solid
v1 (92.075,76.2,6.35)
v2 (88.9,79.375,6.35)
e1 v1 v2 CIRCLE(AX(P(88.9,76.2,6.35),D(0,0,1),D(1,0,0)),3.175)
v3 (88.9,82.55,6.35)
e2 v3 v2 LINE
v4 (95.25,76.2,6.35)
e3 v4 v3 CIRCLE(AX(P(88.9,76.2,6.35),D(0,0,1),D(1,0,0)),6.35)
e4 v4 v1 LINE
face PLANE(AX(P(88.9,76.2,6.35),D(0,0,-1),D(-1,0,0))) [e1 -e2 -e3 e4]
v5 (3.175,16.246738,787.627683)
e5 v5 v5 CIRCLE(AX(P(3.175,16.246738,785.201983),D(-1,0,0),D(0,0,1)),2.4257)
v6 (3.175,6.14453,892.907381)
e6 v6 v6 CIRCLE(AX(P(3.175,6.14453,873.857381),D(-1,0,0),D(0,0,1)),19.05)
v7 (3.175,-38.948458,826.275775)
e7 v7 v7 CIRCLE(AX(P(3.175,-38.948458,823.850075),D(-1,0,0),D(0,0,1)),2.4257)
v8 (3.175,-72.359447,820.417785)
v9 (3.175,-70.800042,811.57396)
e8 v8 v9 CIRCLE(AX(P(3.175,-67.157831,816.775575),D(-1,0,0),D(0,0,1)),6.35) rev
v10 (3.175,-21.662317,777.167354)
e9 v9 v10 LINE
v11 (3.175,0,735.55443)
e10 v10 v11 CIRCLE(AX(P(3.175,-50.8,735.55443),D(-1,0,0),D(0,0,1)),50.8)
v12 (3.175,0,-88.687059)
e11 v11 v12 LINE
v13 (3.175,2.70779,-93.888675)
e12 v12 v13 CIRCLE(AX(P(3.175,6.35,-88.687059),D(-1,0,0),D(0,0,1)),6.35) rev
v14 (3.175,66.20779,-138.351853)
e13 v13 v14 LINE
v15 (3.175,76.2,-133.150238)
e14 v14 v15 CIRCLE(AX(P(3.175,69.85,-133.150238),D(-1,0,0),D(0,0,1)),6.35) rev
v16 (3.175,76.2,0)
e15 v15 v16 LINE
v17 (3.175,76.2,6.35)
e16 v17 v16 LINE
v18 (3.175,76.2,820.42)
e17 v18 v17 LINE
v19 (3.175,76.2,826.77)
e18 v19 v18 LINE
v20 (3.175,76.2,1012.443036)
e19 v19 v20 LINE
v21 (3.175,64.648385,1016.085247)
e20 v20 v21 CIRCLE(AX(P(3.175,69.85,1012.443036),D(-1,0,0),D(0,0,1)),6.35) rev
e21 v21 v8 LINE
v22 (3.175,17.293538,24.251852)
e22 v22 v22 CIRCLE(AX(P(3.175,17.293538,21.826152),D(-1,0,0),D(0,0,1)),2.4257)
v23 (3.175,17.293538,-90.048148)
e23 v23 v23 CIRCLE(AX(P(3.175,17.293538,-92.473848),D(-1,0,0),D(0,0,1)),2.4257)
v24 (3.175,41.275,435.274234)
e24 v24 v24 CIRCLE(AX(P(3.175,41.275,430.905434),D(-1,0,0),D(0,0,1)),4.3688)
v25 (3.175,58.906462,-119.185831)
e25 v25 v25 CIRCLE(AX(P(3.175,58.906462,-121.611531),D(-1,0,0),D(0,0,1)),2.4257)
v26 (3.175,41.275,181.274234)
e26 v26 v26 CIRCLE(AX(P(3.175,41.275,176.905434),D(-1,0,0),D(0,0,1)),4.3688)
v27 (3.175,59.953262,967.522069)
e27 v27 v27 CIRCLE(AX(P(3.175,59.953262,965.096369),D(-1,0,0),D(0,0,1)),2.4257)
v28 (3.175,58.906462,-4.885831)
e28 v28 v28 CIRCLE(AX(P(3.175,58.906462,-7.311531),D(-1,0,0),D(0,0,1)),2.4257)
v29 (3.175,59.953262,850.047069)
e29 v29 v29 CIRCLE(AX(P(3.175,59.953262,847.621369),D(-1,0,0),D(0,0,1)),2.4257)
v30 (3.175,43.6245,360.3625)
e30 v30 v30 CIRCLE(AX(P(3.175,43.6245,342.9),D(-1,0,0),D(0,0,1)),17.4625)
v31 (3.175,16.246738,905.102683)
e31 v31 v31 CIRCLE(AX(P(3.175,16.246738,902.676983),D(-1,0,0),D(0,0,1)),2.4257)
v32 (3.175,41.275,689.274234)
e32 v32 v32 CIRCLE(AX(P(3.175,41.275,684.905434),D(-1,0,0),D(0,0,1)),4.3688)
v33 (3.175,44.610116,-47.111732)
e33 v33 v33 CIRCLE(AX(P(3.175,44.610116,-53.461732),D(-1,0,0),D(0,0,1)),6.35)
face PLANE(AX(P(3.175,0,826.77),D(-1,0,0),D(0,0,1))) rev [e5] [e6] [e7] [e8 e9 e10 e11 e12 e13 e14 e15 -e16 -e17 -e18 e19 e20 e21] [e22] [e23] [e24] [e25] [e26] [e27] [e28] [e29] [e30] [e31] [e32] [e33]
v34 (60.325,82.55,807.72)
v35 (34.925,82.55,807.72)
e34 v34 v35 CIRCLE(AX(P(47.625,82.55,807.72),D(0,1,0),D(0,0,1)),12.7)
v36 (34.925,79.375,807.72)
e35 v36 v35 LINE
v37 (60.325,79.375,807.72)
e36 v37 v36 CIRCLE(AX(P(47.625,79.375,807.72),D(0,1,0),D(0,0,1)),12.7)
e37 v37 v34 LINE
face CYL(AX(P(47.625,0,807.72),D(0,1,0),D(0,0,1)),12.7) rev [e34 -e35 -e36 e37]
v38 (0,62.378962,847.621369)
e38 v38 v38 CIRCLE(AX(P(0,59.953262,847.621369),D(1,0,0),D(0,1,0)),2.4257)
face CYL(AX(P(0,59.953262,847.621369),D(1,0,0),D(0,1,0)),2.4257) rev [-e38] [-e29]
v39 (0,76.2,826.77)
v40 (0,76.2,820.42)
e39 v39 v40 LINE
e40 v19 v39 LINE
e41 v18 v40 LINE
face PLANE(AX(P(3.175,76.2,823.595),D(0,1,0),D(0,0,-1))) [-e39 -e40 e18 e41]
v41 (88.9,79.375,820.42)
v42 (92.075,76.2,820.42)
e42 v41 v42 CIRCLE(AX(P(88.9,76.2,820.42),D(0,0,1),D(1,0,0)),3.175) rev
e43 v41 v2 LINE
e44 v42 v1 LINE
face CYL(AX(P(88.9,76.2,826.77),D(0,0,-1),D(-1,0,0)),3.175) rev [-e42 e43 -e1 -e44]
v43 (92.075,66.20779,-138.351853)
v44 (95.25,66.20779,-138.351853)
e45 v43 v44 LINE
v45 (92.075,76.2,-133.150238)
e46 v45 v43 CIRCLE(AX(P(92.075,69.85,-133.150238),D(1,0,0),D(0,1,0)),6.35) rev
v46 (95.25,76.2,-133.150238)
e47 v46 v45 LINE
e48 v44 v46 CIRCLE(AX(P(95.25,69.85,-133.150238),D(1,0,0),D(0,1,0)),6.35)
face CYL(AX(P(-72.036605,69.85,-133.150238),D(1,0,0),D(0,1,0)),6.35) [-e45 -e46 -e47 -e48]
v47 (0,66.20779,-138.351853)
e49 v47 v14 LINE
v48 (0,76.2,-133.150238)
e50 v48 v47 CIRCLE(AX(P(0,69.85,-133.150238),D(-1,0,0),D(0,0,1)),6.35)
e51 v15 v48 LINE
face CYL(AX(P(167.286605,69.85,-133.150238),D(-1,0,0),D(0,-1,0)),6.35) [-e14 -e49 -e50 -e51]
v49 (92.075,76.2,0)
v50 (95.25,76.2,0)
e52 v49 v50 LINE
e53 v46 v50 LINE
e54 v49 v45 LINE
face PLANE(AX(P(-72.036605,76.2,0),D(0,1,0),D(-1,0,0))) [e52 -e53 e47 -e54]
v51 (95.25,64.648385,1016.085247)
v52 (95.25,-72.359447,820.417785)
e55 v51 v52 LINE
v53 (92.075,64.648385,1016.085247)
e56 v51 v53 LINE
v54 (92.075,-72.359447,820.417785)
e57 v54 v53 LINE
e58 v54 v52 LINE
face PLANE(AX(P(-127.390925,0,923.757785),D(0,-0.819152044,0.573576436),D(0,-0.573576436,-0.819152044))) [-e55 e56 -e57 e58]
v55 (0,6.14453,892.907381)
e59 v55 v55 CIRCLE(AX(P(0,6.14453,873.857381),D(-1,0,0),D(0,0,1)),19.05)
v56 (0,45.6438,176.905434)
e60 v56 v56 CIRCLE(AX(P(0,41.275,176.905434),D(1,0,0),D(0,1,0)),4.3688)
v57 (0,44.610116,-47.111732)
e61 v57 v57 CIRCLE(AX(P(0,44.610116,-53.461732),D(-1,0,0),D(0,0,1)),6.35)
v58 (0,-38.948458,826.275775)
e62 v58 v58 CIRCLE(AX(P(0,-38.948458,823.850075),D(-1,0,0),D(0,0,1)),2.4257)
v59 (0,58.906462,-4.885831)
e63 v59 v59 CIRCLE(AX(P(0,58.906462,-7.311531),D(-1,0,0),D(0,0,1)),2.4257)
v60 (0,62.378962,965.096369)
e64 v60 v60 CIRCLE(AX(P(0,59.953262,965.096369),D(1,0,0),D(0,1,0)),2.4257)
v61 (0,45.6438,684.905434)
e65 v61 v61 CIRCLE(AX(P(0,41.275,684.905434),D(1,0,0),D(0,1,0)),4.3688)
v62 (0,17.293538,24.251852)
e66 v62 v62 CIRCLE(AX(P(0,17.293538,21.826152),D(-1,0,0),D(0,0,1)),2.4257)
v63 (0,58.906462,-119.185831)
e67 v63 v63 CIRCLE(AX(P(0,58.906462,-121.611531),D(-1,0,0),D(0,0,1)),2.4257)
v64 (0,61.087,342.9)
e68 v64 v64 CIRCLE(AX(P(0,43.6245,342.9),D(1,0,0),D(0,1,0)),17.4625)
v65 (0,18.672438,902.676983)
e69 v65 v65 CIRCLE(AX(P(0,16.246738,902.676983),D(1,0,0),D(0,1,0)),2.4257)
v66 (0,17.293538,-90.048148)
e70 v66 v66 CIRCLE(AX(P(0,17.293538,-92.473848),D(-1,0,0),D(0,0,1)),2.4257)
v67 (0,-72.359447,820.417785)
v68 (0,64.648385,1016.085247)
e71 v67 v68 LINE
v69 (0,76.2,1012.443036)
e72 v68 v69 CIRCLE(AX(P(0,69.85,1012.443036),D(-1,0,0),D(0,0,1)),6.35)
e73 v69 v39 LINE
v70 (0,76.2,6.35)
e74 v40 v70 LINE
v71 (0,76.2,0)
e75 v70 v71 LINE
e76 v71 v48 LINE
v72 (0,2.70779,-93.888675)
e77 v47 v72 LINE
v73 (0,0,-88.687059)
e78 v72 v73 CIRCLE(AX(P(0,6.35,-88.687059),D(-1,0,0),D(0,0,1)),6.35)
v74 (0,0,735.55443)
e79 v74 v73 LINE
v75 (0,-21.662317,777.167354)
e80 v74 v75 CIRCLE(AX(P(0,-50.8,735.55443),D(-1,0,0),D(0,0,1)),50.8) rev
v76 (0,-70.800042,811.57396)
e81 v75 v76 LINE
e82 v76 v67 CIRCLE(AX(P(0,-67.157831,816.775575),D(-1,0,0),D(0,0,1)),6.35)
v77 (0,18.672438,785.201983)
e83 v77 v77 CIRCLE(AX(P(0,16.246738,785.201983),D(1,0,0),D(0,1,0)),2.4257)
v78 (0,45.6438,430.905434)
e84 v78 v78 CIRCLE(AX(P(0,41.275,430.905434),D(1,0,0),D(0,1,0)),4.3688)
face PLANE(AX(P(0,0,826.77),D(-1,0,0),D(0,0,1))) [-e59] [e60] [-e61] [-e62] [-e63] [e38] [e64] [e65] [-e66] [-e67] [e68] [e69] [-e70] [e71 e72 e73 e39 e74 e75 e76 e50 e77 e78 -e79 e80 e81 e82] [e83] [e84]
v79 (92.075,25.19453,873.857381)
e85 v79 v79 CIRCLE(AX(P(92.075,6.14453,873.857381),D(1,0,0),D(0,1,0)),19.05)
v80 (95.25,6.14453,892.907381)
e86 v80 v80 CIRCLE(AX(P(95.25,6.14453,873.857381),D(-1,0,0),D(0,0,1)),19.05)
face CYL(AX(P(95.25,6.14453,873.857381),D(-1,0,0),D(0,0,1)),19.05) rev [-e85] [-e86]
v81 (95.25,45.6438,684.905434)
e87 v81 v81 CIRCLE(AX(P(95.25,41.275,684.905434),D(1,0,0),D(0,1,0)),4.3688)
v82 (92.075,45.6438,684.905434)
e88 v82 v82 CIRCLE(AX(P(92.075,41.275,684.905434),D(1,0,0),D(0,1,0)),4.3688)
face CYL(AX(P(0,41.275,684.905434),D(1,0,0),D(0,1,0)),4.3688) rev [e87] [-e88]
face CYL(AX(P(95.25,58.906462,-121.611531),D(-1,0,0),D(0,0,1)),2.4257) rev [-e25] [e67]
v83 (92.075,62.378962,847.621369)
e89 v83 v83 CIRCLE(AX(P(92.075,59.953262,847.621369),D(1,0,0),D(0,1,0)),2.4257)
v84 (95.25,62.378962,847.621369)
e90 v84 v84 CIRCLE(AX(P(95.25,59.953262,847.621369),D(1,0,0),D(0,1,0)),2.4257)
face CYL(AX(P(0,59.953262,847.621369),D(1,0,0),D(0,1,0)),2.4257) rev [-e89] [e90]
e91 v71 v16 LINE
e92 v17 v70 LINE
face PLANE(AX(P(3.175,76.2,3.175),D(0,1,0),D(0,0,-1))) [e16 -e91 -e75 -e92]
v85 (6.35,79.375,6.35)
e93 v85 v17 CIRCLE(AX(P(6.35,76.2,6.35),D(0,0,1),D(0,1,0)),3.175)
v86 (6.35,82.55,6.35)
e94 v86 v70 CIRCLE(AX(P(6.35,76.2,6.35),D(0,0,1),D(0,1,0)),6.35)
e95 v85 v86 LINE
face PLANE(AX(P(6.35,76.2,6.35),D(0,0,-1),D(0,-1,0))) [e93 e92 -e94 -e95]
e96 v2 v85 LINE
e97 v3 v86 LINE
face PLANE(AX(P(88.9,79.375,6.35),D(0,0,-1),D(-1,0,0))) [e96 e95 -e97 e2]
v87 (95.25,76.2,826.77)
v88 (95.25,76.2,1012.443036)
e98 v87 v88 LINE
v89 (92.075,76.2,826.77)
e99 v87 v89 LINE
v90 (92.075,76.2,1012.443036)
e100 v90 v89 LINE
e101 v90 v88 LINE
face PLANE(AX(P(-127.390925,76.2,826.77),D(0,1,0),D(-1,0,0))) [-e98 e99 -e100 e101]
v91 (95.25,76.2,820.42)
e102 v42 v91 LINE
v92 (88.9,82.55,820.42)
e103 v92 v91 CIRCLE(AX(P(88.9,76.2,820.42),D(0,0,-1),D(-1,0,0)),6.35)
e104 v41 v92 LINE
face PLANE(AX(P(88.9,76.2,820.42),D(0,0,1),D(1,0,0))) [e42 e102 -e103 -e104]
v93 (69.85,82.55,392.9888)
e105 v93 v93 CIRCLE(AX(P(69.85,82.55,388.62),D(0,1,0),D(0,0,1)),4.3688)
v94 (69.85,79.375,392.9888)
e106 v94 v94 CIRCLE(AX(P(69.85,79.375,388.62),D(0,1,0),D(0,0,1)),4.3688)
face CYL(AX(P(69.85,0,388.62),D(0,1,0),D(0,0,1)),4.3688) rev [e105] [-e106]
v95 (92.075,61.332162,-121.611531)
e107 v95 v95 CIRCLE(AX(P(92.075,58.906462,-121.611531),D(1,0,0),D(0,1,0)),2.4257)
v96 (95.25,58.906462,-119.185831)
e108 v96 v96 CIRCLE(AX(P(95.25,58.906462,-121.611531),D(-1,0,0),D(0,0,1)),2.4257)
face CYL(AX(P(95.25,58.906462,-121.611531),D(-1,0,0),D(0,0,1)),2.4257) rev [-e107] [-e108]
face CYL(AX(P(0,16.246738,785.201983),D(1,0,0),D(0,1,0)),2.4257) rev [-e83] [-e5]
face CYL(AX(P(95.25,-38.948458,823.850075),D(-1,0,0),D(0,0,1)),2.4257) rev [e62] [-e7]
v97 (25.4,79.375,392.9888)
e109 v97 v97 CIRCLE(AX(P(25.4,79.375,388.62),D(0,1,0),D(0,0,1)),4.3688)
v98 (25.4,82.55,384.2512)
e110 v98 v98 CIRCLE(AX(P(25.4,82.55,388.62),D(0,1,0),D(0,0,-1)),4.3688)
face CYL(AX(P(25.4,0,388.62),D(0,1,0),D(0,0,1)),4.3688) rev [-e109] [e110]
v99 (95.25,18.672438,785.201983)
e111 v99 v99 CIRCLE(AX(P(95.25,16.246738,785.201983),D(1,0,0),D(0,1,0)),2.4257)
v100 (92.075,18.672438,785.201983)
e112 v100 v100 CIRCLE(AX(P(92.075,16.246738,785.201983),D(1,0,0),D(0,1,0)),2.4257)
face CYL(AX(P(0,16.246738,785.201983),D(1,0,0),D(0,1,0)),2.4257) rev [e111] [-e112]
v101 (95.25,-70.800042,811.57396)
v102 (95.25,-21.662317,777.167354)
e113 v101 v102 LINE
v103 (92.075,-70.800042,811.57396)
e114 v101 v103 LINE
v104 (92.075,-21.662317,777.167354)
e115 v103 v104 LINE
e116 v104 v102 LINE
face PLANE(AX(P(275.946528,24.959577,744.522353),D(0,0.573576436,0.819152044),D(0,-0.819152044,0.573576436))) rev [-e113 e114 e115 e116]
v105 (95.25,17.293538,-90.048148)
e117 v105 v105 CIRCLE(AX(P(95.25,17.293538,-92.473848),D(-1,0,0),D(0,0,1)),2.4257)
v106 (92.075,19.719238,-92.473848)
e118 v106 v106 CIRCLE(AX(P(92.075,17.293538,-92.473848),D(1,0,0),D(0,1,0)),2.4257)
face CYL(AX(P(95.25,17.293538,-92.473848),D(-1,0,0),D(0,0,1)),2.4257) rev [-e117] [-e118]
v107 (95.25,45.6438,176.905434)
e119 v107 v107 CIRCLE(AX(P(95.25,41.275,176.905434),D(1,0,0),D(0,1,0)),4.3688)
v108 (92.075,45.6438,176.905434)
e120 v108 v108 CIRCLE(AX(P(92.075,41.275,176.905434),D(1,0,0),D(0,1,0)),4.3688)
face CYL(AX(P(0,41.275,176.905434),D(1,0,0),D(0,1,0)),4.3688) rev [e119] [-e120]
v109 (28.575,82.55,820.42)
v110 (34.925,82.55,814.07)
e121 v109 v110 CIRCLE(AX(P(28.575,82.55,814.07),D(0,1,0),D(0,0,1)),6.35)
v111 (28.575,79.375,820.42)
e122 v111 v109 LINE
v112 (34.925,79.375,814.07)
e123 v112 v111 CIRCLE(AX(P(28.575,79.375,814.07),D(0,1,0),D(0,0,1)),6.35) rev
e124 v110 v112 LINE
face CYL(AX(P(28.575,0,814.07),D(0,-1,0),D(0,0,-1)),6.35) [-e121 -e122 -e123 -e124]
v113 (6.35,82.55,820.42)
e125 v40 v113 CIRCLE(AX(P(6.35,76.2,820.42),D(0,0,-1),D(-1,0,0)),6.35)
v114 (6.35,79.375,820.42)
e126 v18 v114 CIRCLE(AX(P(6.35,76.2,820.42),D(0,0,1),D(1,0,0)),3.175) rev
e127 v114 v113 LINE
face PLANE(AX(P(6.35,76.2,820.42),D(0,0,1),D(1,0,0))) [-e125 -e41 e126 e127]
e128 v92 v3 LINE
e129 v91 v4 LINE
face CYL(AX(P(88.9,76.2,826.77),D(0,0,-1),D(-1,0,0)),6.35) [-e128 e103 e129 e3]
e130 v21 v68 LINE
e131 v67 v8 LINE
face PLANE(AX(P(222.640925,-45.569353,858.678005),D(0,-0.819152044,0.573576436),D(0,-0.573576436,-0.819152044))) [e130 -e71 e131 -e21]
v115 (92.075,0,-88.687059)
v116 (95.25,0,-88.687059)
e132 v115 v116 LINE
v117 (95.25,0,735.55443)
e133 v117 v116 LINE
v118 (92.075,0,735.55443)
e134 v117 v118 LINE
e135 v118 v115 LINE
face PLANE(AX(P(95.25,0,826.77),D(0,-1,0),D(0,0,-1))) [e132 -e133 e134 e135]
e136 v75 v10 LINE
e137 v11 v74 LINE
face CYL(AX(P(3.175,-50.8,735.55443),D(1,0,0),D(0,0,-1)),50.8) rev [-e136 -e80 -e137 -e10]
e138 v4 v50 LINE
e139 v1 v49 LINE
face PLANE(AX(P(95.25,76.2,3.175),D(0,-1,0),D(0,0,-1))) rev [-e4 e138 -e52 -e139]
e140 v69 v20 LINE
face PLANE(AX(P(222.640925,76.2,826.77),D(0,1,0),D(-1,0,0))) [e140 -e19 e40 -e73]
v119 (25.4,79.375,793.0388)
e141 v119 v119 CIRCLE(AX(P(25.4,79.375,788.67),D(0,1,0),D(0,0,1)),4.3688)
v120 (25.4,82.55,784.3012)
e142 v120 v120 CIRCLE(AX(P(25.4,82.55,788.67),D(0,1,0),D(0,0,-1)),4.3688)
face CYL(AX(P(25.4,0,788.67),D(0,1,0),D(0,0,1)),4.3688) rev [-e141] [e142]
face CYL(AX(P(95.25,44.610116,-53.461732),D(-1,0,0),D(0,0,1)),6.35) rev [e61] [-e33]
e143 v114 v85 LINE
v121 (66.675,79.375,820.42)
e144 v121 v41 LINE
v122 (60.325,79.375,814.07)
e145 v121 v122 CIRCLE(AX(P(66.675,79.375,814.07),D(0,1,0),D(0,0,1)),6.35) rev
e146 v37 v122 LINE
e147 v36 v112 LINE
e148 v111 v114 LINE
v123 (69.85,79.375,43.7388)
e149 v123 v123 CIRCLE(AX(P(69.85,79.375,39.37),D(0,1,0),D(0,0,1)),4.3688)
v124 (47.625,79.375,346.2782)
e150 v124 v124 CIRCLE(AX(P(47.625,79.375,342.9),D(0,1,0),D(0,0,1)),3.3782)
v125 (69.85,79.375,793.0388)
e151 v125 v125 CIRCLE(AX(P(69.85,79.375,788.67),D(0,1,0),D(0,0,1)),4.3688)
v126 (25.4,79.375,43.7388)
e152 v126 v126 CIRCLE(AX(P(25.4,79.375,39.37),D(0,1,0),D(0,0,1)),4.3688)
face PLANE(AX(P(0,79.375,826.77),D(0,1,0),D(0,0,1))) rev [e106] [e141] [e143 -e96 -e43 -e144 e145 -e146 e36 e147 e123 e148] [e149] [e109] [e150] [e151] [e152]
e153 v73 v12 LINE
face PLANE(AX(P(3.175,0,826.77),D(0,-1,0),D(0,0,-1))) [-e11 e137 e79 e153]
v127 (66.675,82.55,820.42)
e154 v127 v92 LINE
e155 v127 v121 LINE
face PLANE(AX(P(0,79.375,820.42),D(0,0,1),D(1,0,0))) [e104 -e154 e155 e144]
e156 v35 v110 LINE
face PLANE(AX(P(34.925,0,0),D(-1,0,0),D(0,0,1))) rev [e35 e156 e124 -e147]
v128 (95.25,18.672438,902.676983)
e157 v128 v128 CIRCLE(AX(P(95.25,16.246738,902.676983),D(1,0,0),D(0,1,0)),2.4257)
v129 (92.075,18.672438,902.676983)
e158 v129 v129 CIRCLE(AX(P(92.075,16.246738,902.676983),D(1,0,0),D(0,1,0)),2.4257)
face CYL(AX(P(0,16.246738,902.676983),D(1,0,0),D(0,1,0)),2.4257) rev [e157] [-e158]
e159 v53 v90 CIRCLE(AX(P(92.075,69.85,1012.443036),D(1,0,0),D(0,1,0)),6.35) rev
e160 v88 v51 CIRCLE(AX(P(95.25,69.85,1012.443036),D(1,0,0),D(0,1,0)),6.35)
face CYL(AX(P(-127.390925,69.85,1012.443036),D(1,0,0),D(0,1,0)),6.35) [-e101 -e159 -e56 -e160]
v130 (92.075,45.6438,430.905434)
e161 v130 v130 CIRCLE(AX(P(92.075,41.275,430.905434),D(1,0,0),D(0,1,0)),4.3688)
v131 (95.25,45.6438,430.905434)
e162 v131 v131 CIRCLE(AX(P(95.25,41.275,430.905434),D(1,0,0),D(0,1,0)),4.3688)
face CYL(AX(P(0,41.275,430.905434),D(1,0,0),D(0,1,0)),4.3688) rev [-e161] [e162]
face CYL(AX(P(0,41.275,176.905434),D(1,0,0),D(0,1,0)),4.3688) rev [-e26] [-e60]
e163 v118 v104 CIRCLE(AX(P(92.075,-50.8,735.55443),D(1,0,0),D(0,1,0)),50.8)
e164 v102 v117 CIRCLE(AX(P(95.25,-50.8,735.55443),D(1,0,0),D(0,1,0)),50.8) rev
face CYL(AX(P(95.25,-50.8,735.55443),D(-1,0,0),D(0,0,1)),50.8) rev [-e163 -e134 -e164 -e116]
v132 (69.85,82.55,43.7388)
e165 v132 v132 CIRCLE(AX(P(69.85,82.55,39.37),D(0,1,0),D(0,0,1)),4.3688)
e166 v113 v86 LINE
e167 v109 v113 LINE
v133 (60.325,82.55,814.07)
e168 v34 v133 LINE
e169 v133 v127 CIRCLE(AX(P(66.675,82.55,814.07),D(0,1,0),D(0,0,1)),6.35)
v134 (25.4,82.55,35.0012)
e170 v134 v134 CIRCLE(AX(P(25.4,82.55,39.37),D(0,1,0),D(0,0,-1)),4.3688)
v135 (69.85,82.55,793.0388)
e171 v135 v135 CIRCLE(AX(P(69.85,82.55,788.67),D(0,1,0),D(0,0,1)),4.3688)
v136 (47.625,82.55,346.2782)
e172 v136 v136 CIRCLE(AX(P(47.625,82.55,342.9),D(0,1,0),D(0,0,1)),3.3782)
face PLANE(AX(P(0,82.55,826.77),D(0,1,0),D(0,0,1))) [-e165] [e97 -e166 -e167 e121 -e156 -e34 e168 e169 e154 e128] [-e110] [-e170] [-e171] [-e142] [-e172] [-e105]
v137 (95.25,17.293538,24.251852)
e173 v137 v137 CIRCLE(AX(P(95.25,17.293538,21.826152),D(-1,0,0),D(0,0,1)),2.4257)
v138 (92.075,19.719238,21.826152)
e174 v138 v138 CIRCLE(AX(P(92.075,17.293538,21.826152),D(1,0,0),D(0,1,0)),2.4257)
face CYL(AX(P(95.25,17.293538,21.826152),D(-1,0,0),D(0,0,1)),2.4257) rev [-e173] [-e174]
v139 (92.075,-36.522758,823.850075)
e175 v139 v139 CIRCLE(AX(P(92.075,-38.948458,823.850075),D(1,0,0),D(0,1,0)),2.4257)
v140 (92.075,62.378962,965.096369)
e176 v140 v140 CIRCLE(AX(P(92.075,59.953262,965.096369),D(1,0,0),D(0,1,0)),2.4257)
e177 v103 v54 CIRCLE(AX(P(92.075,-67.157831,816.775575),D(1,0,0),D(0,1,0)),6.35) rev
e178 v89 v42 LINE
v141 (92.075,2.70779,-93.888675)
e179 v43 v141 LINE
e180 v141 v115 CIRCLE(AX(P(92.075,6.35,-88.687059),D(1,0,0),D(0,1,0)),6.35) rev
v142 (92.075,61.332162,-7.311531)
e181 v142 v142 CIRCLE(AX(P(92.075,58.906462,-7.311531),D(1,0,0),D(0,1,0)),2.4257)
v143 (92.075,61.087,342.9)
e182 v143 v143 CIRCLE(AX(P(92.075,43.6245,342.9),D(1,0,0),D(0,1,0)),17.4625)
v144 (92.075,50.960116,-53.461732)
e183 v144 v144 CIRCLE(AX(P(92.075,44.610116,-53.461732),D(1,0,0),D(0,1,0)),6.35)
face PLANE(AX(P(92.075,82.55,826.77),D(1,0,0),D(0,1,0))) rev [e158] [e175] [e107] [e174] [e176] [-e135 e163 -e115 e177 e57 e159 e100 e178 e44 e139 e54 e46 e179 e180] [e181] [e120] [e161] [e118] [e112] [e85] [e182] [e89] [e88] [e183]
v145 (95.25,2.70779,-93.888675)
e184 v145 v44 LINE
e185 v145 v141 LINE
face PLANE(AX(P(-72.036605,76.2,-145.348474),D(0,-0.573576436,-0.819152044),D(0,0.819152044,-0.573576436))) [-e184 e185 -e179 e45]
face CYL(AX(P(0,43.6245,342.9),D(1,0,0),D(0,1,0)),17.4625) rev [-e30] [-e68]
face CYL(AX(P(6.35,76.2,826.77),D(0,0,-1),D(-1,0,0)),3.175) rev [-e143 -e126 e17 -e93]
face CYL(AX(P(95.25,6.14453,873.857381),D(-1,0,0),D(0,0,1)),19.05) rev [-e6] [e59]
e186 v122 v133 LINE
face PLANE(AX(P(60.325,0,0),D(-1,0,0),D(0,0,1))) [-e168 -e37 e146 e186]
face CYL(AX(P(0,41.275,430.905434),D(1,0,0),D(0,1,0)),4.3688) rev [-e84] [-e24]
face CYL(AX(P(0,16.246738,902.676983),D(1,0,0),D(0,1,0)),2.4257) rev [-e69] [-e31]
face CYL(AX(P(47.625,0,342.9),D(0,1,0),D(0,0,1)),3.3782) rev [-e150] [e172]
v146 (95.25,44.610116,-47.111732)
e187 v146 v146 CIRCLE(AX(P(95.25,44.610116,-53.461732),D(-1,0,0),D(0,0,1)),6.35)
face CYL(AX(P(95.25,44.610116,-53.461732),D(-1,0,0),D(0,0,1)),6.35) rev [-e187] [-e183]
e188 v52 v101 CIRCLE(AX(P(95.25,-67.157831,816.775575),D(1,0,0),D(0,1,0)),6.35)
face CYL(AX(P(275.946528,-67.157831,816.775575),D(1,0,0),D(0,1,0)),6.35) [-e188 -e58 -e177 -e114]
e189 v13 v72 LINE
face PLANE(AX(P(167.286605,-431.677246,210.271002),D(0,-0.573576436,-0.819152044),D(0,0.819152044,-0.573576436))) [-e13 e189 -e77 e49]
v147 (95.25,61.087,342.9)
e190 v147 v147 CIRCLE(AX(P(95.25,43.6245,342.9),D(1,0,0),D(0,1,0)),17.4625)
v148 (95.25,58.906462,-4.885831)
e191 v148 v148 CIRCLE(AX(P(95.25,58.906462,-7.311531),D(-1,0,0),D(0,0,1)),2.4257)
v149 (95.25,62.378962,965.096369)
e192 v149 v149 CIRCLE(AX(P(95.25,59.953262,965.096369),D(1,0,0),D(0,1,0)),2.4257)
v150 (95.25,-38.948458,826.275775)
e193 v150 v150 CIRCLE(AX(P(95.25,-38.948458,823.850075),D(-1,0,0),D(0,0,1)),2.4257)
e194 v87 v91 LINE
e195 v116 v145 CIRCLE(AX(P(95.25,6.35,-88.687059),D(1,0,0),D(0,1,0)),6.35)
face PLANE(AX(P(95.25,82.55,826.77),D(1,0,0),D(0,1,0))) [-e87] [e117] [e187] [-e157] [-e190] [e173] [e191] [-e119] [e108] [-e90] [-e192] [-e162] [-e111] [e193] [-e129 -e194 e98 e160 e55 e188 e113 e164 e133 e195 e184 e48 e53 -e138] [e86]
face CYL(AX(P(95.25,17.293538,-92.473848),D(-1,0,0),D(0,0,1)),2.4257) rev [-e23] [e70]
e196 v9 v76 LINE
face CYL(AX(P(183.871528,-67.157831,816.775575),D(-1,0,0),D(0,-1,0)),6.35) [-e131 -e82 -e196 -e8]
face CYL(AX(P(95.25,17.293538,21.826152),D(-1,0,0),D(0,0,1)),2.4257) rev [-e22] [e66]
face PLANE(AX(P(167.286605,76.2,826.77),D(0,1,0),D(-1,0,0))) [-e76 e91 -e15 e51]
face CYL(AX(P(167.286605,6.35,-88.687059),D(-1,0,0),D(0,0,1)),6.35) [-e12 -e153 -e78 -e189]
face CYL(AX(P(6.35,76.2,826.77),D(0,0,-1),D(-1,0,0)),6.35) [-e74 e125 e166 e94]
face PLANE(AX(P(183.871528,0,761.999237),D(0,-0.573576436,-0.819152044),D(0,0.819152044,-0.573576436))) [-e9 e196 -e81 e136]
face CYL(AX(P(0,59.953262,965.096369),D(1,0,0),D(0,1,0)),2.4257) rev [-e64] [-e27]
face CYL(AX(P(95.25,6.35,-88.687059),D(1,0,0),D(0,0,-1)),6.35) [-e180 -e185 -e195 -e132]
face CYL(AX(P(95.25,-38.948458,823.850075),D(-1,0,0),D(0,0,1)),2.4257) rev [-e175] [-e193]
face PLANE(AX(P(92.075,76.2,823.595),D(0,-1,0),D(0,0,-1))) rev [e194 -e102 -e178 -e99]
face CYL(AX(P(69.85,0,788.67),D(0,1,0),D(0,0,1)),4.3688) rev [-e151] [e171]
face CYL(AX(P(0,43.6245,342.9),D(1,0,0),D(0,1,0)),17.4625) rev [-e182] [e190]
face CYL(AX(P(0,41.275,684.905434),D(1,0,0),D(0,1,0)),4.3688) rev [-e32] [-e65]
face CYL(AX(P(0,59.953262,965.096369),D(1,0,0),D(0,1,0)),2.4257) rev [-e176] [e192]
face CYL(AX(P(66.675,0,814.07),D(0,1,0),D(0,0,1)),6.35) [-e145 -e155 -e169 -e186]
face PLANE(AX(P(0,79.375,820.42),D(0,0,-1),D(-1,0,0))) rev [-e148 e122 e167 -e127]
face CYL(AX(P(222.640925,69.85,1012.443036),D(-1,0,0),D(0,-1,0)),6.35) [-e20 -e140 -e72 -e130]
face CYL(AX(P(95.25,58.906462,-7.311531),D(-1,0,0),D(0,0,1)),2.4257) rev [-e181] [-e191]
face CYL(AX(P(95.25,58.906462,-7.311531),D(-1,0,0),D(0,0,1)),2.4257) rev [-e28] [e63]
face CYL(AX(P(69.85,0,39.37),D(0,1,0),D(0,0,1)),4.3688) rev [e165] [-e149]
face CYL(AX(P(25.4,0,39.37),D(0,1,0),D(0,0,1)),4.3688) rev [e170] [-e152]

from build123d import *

# Parameters (mm, degrees)
BASE_FLANGE1_DEPTH  = 826.77
BOSS_EXTRUDE1_DEPTH = 3.175
BOSS_EXTRUDE2_START = -95.25
BOSS_EXTRUDE2_DEPTH = 3.175
BOSS_EXTRUDE3_DEPTH = 3.175
BOSS_EXTRUDE4_START = -95.25
BOSS_EXTRUDE4_DEPTH = 3.175
FILLET1_R           = 6.35
SKETCH10_R          = 2.4257
CUT_EXTRUDE1_DEPTH  = 1027.560429748
SKETCH11_R          = 4.3688
CUT_EXTRUDE2_DEPTH  = 1027.560429748
SKETCH12_R          = 17.4625
CUT_EXTRUDE3_DEPTH  = 1027.560429748
SKETCH13_R          = 3.3782
CUT_EXTRUDE4_DEPTH  = 1027.560429748
CUT_EXTRUDE5_DEPTH  = 1027.560429748
SKETCH15_R          = 4.3688
CUT_EXTRUDE6_DEPTH  = 1027.560429748
BOSS_EXTRUDE5_DEPTH = 3.175
BOSS_EXTRUDE6_START = -95.25
BOSS_EXTRUDE6_DEPTH = 3.175
SKETCH17_R          = 2.4257
CUT_EXTRUDE7_DEPTH  = 1027.560429748
FILLET3_R           = 50.8
FILLET4_R           = 6.35
SKETCH18_R          = 19.05
CUT_EXTRUDE8_DEPTH  = 1027.560429748
BOSS_EXTRUDE7_START = -3.175
SKETCH19_R          = 2.4257
BOSS_EXTRUDE7_DEPTH = 3.175
BOSS_EXTRUDE8_START = -3.175
SKETCH20_R          = 2.4257
BOSS_EXTRUDE8_DEPTH = 3.175
SKETCH21_R          = 2.4257
CUT_EXTRUDE9_DEPTH  = 1027.560429748
SKETCH22_R          = 6.35
CUT_EXTRUDE10_DEPTH = 1027.560429748
CUT_EXTRUDE11_DEPTH = 6.35
CUT_EXTRUDE12_START = -6.35
SKETCH24_W          = 28.575
SKETCH24_H          = 3.175
CUT_EXTRUDE12_DEPTH = 6.35
FILLET2_R           = 6.35


# Sheet-metal steps are written as plain solids
with BuildPart() as part:
    # Sketch1 → Base-Flange1 (new body)
    with BuildSketch(Plane.XY):
        with BuildLine():
            Line((0, 0), (0, 76.2))
            ThreePointArc((0, 76.2), (1.859871939, 80.690128061), (6.35, 82.55))
            Line((6.35, 82.55), (88.9, 82.55))
            ThreePointArc((88.9, 82.55), (93.390128061, 80.690128061), (95.25, 76.2))
            Line((95.25, 76.2), (95.25, 0))
            Line((95.25, 0), (92.075, 0))
            Line((92.075, 0), (92.075, 76.2))
            ThreePointArc((92.075, 76.2), (91.14506403, 78.44506403), (88.9, 79.375))
            Line((88.9, 79.375), (6.35, 79.375))
            ThreePointArc((6.35, 79.375), (4.10493597, 78.44506403), (3.175, 76.2))
            Line((3.175, 76.2), (3.175, 0))
            Line((3.175, 0), (0, 0))
        make_face()
    extrude(amount=BASE_FLANGE1_DEPTH)

    # Sketch8 → Boss-Extrude1 (add)
    with BuildSketch(Plane(origin=(95.25, 0, 0), x_dir=(0, 0, -1), z_dir=(1, 0, 0))):
        Polygon((-826.77, 0), (-923.757785236, 0), (-1032.58266335, 76.2), (-826.77, 76.2), align=None)
    extrude(amount=-BOSS_EXTRUDE1_DEPTH)

    # Sketch8<2> → Boss-Extrude2 (add)
    with BuildSketch(Plane(origin=(95.25, 0, 0), x_dir=(0, 0, -1), z_dir=(1, 0, 0)).offset(BOSS_EXTRUDE2_START)):
        Polygon((-826.77, 0), (-923.757785236, 0), (-1032.58266335, 76.2), (-826.77, 76.2), align=None)
    extrude(amount=BOSS_EXTRUDE2_DEPTH)

    # Sketch9 → Boss-Extrude3 (add)
    with BuildSketch(Plane(origin=(95.25, 0, 0), x_dir=(0, 0, -1), z_dir=(1, 0, 0))):
        Polygon((0, 76.2), (145.348474474, 76.2), (91.992660063, 0), (0, 0), align=None)
    extrude(amount=-BOSS_EXTRUDE3_DEPTH)

    # Sketch9<3> → Boss-Extrude4 (add)
    with BuildSketch(Plane(origin=(95.25, 0, 0), x_dir=(0, 0, -1), z_dir=(1, 0, 0)).offset(BOSS_EXTRUDE4_START)):
        Polygon((0, 76.2), (145.348474474, 76.2), (91.992660063, 0), (0, 0), align=None)
    extrude(amount=BOSS_EXTRUDE4_DEPTH)

    # Fillet1
    fillet1_edges = [part.edges().sort_by_distance(p)[0] for p in [
        (93.6625, 0, 923.757785236),
        (93.6625, 76.2, 1032.58266335),
        (1.5875, 0, 923.757785236),
        (1.5875, 76.2, 1032.58266335),
        (93.6625, 76.2, -145.348474474),
        (93.6625, 0, -91.992660063),
        (1.5875, 76.2, -145.348474474),
        (1.5875, 0, -91.992660063),
    ]]
    fillet(fillet1_edges, radius=FILLET1_R)

    # Sketch10 → Cut-Extrude1 (cut, through all)
    with BuildSketch(Plane(origin=(95.25, 0, 0), x_dir=(0, 0, -1), z_dir=(1, 0, 0))):
        with Locations(Location((102.231734197, 58.906461925, 0), (0, 0, 90))):
            Circle(SKETCH10_R)
        with Locations(Location((73.094051231, 17.293538075, 0), (0, 0, 90))):
            Circle(SKETCH10_R)
        with Locations(Location((26.031734197, 58.906461925, 0), (0, 0, 90))):
            Circle(SKETCH10_R)
        with Locations(Location((-3.105948769, 17.293538075, 0), (0, 0, 90))):
            Circle(SKETCH10_R)
        with Locations(Location((-965.096368571, 59.953262225, 0), (0, 0, 90))):
            Circle(SKETCH10_R)
        with Locations(Location((-902.676982797, 16.246737775, 0), (0, 0, 90))):
            Circle(SKETCH10_R)
        with Locations(Location((-847.621368571, 59.953262225, 0), (0, 0, 90))):
            Circle(SKETCH10_R)
        with Locations(Location((-785.201982797, 16.246737775, 0), (0, 0, 90))):
            Circle(SKETCH10_R)
    extrude(amount=-CUT_EXTRUDE1_DEPTH, mode=Mode.SUBTRACT)

    # Sketch11 → Cut-Extrude2 (cut, through all)
    with BuildSketch(Plane(origin=(0, 82.55, 0), x_dir=(1, 0, 0), z_dir=(0, 1, 0))):
        with Locations(Location((69.85, -788.67, 0), (0, 0, 270))):
            Circle(SKETCH11_R)
        with Locations(Location((69.85, -39.37, 0), (0, 0, 270))):
            Circle(SKETCH11_R)
        with Locations(Location((69.85, -388.62, 0), (0, 0, 270))):
            Circle(SKETCH11_R)
        with Locations(Location((25.4, -388.62, 0), (0, 0, 270))):
            Circle(SKETCH11_R)
        with Locations(Location((25.4, -39.37, 0), (0, 0, 270))):
            Circle(SKETCH11_R)
        with Locations(Location((25.4, -788.67, 0), (0, 0, 270))):
            Circle(SKETCH11_R)
    extrude(amount=-CUT_EXTRUDE2_DEPTH, mode=Mode.SUBTRACT)

    # Sketch12 → Cut-Extrude3 (cut, through all)
    with BuildSketch(Plane(origin=(95.25, 0, 0), x_dir=(0, 0, -1), z_dir=(1, 0, 0))):
        with Locations(Location((-342.9, 43.6245, 0), (0, 0, 90))):
            Circle(SKETCH12_R)
    extrude(amount=-CUT_EXTRUDE3_DEPTH, mode=Mode.SUBTRACT)

    # Sketch13 → Cut-Extrude4 (cut, through all)
    with BuildSketch(Plane(origin=(0, 82.55, 0), x_dir=(1, 0, 0), z_dir=(0, 1, 0))):
        with Locations(Location((47.625, -342.9, 0), (0, 0, 270))):
            Circle(SKETCH13_R)
    extrude(amount=-CUT_EXTRUDE4_DEPTH, mode=Mode.SUBTRACT)

    # Sketch14 → Cut-Extrude5 (cut, through all)
    with BuildSketch(Plane(origin=(0, 82.55, 0), x_dir=(1, 0, 0), z_dir=(0, 1, 0))):
        with BuildLine():
            Line((34.925, -826.77), (60.325, -826.77))
            Line((60.325, -826.77), (60.325, -807.72))
            ThreePointArc((60.325, -807.72), (47.625, -795.02), (34.925, -807.72))
            Line((34.925, -807.72), (34.925, -826.77))
        make_face()
    extrude(amount=-CUT_EXTRUDE5_DEPTH, mode=Mode.SUBTRACT)

    # Sketch15 → Cut-Extrude6 (cut, through all)
    with BuildSketch(Plane(origin=(95.25, 0, 0), x_dir=(0, 0, -1), z_dir=(1, 0, 0))):
        with Locations(Location((-430.905434006, 41.275, 0), (0, 0, 90))):
            Circle(SKETCH15_R)
        with Locations(Location((-684.905434006, 41.275, 0), (0, 0, 90))):
            Circle(SKETCH15_R)
        with Locations(Location((-176.905434006, 41.275, 0), (0, 0, 90))):
            Circle(SKETCH15_R)
    extrude(amount=-CUT_EXTRUDE6_DEPTH, mode=Mode.SUBTRACT)

    # Sketch16 → Boss-Extrude5 (add)
    with BuildSketch(Plane.ZY):
        with BuildLine():
            Line((921.755637927, 0), (761.999236627, 0))
            Line((761.999236627, 0), (815.216169942, -76.001657238))
            Line((815.216169942, -76.001657238), (925.397848297, 1.148384519))
            ThreePointArc((925.397848297, 1.148384519), (923.665119753, 0.293897363), (921.755637927, 0))
        make_face()
    extrude(amount=-BOSS_EXTRUDE5_DEPTH)

    # Sketch16<2> → Boss-Extrude6 (add)
    with BuildSketch(Plane.ZY.offset(BOSS_EXTRUDE6_START)):
        with BuildLine():
            Line((921.755637927, 0), (761.999236627, 0))
            Line((761.999236627, 0), (815.216169942, -76.001657238))
            Line((815.216169942, -76.001657238), (925.397848297, 1.148384519))
            ThreePointArc((925.397848297, 1.148384519), (923.665119753, 0.293897363), (921.755637927, 0))
        make_face()
    extrude(amount=BOSS_EXTRUDE6_DEPTH)

    # Sketch17 → Cut-Extrude7 (cut, through all)
    with BuildSketch(Plane.ZY):
        with Locations((823.850074628, -38.948457538)):
            Circle(SKETCH17_R)
    extrude(amount=-CUT_EXTRUDE7_DEPTH, mode=Mode.SUBTRACT)

    # Fillet3
    fillet3_edges = [part.edges().sort_by_distance(p)[0] for p in [
        (1.5875, 0, 761.999236627),
        (93.6625, 0, 761.999236627),
    ]]
    fillet(fillet3_edges, radius=FILLET3_R)

    # Fillet4
    fillet4_edges = [part.edges().sort_by_distance(p)[0] for p in [
        (1.5875, -76.001657238, 815.216169942),
        (93.6625, -76.001657238, 815.216169942),
    ]]
    fillet(fillet4_edges, radius=FILLET4_R)

    # Sketch18 → Cut-Extrude8 (cut, through all)
    with BuildSketch(Plane.ZY):
        with Locations((873.857381249, 6.144529753)):
            Circle(SKETCH18_R)
    extrude(amount=-CUT_EXTRUDE8_DEPTH, mode=Mode.SUBTRACT)

    # Sketch19 → Boss-Extrude7 (add)
    with BuildSketch(Plane.ZY.offset(BOSS_EXTRUDE7_START)):
        with Locations(Location((-26.031734197, 58.906461925, 0), (0, 0, 90))):
            Circle(SKETCH19_R)
        with Locations(Location((3.105948769, 17.293538075, 0), (0, 0, 90))):
            Circle(SKETCH19_R)
        with Locations(Location((-73.094051231, 17.293538075, 0), (0, 0, 90))):
            Circle(SKETCH19_R)
        with Locations(Location((-102.231734197, 58.906461925, 0), (0, 0, 90))):
            Circle(SKETCH19_R)
    extrude(amount=BOSS_EXTRUDE7_DEPTH)

    # Sketch20 → Boss-Extrude8 (add)
    with BuildSketch(Plane(origin=(95.25, 0, 0), x_dir=(0, 0, -1), z_dir=(1, 0, 0)).offset(BOSS_EXTRUDE8_START)):
        with Locations((102.231734197, 58.906461925)):
            Circle(SKETCH20_R)
        with Locations((73.094051231, 17.293538075)):
            Circle(SKETCH20_R)
        with Locations((-3.105948769, 17.293538075)):
            Circle(SKETCH20_R)
        with Locations((26.031734197, 58.906461925)):
            Circle(SKETCH20_R)
    extrude(amount=BOSS_EXTRUDE8_DEPTH)

    # Sketch21 → Cut-Extrude9 (cut, through all)
    with BuildSketch(Plane.ZY):
        with Locations((-121.611530794, 58.906461925)):
            Circle(SKETCH21_R)
        with Locations((-92.473847827, 17.293538075)):
            Circle(SKETCH21_R)
        with Locations((-7.311530794, 58.906461925)):
            Circle(SKETCH21_R)
        with Locations((21.826152173, 17.293538075)):
            Circle(SKETCH21_R)
    extrude(amount=-CUT_EXTRUDE9_DEPTH, mode=Mode.SUBTRACT)

    # Sketch22 → Cut-Extrude10 (cut, through all)
    with BuildSketch(Plane.ZY):
        with Locations((-53.461731718, 44.610115856)):
            Circle(SKETCH22_R)
    extrude(amount=-CUT_EXTRUDE10_DEPTH, mode=Mode.SUBTRACT)

    # Sketch23 → Cut-Extrude11 (cut)
    with BuildSketch(Plane(origin=(0, 0, 0), x_dir=(-1, 0, 0), z_dir=(0, 0, -1))):
        with BuildLine():
            Line((-3.175, 76.2), (0, 76.2))
            ThreePointArc((0, 76.2), (-1.859871939, 80.690128061), (-6.35, 82.55))
            Line((-6.35, 82.55), (-88.9, 82.55))
            ThreePointArc((-88.9, 82.55), (-93.390128061, 80.690128061), (-95.25, 76.2))
            Line((-95.25, 76.2), (-92.075, 76.2))
            ThreePointArc((-92.075, 76.2), (-91.14506403, 78.44506403), (-88.9, 79.375))
            Line((-88.9, 79.375), (-6.35, 79.375))
            ThreePointArc((-6.35, 79.375), (-4.10493597, 78.44506403), (-3.175, 76.2))
        make_face()
    extrude(amount=-CUT_EXTRUDE11_DEPTH, mode=Mode.SUBTRACT)

    # Sketch24 → Cut-Extrude12 (cut)
    with BuildSketch(Plane.XY.offset(826.77).offset(CUT_EXTRUDE12_START)):
        with BuildLine():
            ThreePointArc((6.35, 79.375), (4.10493597, 78.44506403), (3.175, 76.2))
            Line((3.175, 76.2), (0, 76.2))
            ThreePointArc((0, 76.2), (1.859871939, 80.690128061), (6.35, 82.55))
            Line((6.35, 82.55), (34.925, 82.55))
            Line((34.925, 82.55), (34.925, 79.375))
            Line((34.925, 79.375), (6.35, 79.375))
        make_face()
        with Locations((74.6125, 80.9625)):
            Rectangle(SKETCH24_W, SKETCH24_H)
        with BuildLine():
            ThreePointArc((92.075, 76.2), (91.14506403, 78.44506403), (88.9, 79.375))
            Line((88.9, 79.375), (88.9, 82.55))
            ThreePointArc((88.9, 82.55), (93.390128061, 80.690128061), (95.25, 76.2))
            Line((95.25, 76.2), (92.075, 76.2))
        make_face()
    extrude(amount=CUT_EXTRUDE12_DEPTH, mode=Mode.SUBTRACT)

    # Fillet2
    fillet2_edges = [part.edges().sort_by_distance(p)[0] for p in [
        (60.325, 80.9625, 820.42),
        (34.925, 80.9625, 820.42),
    ]]
    fillet(fillet2_edges, radius=FILLET2_R)


solid = part.part
